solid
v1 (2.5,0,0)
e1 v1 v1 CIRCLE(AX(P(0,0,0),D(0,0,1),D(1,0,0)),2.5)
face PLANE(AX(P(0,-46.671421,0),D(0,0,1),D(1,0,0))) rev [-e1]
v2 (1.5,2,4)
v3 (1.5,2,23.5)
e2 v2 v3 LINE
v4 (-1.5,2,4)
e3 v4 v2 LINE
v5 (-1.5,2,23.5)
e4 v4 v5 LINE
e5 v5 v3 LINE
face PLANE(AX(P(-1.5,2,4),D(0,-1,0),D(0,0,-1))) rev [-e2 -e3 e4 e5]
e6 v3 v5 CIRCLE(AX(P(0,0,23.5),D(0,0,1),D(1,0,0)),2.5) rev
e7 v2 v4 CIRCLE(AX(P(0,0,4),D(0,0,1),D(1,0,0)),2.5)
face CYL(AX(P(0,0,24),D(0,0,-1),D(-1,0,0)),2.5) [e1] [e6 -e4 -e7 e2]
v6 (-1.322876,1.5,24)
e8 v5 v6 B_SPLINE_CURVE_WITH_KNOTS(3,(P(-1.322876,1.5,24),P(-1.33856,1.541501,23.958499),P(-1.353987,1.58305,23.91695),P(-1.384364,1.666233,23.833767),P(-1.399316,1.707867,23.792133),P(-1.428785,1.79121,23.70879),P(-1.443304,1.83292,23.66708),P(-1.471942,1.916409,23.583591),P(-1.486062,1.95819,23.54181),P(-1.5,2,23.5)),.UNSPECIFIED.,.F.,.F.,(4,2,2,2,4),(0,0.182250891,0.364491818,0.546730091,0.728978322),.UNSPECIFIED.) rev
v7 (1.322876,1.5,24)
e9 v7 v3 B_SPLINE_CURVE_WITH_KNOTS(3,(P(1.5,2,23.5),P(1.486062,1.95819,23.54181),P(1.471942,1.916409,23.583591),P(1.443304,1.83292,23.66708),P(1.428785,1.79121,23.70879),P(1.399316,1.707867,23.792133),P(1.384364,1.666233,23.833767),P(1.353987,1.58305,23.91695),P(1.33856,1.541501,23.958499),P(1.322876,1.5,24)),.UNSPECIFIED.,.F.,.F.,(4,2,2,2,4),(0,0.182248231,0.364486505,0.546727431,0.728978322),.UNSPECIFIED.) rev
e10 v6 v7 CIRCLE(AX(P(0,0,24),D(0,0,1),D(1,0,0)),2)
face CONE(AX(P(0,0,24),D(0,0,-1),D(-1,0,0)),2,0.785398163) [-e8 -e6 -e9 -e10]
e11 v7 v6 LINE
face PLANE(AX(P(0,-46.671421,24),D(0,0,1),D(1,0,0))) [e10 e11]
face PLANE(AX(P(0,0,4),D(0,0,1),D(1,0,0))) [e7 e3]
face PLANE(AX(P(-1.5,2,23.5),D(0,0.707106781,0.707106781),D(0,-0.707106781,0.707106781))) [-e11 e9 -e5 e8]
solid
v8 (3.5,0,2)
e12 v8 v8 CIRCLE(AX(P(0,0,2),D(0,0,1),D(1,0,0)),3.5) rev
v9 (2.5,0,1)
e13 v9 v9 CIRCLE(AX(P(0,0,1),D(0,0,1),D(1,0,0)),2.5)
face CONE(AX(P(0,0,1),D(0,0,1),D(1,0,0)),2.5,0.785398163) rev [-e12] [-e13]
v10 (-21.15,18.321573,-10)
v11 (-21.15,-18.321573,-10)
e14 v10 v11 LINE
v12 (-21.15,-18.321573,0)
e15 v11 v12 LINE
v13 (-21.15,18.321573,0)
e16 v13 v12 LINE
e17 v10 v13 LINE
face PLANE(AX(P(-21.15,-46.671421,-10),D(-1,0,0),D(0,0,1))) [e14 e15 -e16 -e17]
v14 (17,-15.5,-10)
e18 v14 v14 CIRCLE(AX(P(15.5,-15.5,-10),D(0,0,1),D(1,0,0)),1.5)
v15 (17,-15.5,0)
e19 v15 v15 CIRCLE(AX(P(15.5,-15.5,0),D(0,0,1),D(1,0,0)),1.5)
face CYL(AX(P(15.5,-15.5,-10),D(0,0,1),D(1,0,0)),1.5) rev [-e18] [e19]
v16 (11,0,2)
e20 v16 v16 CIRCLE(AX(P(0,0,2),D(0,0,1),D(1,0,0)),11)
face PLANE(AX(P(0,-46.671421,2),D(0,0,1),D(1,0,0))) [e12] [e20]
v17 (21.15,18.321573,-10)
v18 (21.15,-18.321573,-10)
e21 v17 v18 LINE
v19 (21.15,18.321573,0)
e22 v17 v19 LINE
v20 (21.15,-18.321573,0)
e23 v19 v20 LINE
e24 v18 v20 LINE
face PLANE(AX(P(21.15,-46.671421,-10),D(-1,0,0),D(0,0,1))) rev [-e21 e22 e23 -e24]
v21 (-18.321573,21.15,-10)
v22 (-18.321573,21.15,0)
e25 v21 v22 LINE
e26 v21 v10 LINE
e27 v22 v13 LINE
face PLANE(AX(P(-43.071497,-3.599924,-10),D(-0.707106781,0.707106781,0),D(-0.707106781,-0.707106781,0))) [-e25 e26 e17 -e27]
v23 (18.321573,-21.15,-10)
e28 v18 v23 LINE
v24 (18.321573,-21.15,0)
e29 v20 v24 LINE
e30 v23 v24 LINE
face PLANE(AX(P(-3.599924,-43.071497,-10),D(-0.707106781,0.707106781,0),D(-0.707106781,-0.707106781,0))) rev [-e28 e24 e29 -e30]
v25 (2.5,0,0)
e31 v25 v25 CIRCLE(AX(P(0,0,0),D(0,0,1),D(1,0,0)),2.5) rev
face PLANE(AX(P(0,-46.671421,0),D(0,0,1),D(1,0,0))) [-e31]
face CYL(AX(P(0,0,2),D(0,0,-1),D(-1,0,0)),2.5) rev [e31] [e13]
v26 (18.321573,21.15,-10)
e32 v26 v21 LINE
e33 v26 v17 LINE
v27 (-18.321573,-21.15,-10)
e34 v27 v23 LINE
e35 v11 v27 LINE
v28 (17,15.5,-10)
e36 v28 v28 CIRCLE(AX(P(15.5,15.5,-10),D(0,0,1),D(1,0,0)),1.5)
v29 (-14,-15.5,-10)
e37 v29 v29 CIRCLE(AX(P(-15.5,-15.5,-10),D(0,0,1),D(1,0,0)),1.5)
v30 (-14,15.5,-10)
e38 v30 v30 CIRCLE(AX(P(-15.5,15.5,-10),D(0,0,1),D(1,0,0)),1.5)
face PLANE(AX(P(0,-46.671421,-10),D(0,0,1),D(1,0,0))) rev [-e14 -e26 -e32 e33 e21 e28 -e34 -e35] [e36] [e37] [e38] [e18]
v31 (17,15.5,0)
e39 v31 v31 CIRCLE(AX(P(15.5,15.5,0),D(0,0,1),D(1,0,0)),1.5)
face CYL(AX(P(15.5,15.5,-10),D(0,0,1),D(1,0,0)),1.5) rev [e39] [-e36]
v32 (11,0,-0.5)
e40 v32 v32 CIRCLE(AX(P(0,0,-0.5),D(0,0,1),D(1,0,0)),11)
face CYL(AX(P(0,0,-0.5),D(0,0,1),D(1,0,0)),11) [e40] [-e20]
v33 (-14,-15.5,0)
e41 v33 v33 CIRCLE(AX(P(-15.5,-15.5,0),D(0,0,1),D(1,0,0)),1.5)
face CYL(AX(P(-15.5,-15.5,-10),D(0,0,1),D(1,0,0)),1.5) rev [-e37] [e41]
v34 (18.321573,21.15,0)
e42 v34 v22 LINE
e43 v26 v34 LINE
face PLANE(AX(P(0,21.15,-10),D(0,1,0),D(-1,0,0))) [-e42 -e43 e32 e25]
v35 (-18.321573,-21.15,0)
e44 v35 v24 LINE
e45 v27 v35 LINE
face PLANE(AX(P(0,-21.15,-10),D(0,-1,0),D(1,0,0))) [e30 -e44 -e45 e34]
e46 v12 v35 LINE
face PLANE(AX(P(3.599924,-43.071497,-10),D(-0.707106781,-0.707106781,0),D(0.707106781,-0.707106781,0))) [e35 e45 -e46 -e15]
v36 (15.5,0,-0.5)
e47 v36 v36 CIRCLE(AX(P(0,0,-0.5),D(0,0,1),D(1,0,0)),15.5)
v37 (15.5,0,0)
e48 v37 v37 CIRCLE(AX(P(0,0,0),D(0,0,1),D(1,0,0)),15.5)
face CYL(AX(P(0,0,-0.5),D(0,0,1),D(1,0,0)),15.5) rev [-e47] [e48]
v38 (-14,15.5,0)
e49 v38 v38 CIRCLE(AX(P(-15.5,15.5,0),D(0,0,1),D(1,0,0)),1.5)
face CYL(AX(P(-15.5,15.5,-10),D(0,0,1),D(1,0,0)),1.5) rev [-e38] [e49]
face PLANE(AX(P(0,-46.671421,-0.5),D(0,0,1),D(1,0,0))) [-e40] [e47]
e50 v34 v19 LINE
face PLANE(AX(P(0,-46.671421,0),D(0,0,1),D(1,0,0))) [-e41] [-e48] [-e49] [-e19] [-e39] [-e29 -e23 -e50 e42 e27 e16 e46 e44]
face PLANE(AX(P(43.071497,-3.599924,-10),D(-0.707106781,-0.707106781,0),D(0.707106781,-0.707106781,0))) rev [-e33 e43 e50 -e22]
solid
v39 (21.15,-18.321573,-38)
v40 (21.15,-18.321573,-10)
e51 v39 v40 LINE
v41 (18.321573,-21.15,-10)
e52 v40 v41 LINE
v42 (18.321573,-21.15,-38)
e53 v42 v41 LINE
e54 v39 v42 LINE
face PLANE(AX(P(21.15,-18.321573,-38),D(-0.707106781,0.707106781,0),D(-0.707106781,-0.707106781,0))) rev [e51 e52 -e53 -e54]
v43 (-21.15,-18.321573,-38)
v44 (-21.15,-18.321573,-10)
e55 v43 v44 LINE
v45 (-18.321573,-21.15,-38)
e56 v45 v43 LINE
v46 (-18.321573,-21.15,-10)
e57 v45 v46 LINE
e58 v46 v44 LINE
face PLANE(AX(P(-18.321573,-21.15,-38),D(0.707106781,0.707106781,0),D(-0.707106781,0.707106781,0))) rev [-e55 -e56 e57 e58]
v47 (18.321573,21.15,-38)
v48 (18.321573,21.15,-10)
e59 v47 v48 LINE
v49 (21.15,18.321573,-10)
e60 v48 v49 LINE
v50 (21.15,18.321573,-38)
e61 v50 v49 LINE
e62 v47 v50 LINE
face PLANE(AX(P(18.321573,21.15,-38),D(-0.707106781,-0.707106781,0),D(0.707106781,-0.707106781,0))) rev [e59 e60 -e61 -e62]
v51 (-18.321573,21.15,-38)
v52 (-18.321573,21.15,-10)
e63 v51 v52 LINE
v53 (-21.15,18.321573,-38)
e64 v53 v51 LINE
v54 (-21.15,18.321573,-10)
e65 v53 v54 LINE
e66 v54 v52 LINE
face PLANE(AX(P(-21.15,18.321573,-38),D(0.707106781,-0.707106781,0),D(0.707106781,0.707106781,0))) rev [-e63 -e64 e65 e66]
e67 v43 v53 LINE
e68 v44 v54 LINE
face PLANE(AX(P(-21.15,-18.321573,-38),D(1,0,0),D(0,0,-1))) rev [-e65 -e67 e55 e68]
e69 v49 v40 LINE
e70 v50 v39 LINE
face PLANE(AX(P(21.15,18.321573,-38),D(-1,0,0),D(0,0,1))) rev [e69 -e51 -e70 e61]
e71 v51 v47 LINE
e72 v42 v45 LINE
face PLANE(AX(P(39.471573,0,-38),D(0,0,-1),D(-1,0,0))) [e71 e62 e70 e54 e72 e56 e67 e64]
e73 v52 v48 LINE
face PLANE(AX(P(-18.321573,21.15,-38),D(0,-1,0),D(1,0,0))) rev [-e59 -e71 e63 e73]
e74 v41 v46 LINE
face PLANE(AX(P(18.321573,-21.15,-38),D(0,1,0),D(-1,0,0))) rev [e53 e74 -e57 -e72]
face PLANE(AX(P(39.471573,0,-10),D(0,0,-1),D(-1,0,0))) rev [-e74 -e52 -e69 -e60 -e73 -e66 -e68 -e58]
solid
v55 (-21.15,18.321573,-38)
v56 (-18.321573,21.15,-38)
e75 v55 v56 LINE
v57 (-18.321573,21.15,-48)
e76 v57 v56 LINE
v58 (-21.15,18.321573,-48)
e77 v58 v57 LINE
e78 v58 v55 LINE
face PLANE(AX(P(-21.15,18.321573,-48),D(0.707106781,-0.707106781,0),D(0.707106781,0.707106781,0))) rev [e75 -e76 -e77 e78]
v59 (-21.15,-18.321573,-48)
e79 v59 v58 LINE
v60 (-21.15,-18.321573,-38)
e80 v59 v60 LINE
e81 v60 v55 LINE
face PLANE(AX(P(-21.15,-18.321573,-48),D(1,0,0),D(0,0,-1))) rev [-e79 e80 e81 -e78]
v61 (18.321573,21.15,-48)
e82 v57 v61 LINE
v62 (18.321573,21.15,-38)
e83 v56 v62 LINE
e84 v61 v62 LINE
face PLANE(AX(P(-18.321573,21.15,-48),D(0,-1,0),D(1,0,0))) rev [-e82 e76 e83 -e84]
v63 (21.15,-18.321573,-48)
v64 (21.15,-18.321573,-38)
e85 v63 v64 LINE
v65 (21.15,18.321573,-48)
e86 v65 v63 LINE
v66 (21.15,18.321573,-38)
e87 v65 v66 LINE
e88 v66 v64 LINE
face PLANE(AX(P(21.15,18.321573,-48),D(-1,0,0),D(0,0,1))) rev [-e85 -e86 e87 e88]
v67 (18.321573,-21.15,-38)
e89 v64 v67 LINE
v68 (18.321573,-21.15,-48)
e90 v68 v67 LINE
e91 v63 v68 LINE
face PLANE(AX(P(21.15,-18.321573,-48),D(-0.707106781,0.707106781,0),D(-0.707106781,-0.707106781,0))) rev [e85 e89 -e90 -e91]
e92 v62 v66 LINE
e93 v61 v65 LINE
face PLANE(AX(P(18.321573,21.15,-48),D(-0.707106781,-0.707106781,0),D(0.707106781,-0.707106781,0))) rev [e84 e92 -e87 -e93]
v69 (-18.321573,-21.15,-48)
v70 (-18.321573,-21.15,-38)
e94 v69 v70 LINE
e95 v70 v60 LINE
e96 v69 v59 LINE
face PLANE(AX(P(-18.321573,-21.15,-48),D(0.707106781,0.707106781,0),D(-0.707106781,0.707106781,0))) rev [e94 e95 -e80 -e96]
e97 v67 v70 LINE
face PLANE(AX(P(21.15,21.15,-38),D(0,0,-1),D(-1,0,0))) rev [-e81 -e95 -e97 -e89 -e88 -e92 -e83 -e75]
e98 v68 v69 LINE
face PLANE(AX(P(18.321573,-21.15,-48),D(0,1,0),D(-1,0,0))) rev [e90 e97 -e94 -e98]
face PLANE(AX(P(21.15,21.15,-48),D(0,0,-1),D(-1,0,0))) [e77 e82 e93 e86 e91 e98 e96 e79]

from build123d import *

# Parameters (mm, degrees)
SKETCH_1_R          = 1.5
EXTRUDE_1_DEPTH     = 10
EXTRUDE_2_DEPTH     = 28
EXTRUDE_3_DEPTH     = 10
SKETCH_1_3_R        = 15.5
SKETCH_1_3_R_2      = 11
CUT_EXTRUDE_1_DEPTH = 0.5
EXTRUDE_START       = 2
SKETCH_1_4_R        = 11
SKETCH_1_4_R_2      = 2.5
EXTRUDE_4_DEPTH     = 2
CHAMFER_1_SIZE      = 1
SKETCH_1_5_R        = 2.5
EXTRUDE_5_DEPTH     = 24
CUT_EXTRUDE_2_DEPTH = 20
CHAMFER_2_SIZE      = 0.5


with BuildPart() as part:
    # 草图1 → 凸台-拉伸1 (new body)
    with BuildSketch(Plane.XY):
        Polygon((18.321572875, 21.15), (-18.321572875, 21.15), (-21.15, 18.321572875), (-21.15, -18.321572875), (-18.321572875, -21.15), (18.321572875, -21.15), (21.15, -18.321572875), (21.15, 18.321572875), align=None)
        with Locations((-15.5, 15.5)):
            Circle(SKETCH_1_R, mode=Mode.SUBTRACT)
        with Locations((15.5, 15.5)):
            Circle(SKETCH_1_R, mode=Mode.SUBTRACT)
        with Locations((15.5, -15.5)):
            Circle(SKETCH_1_R, mode=Mode.SUBTRACT)
        with Locations((-15.5, -15.5)):
            Circle(SKETCH_1_R, mode=Mode.SUBTRACT)
    extrude(amount=-EXTRUDE_1_DEPTH)

    # 草图1<3> → 切除-拉伸1 (cut)
    with BuildSketch(Plane.XY):
        Circle(SKETCH_1_3_R)
        Circle(SKETCH_1_3_R_2, mode=Mode.SUBTRACT)
    extrude(amount=-CUT_EXTRUDE_1_DEPTH, mode=Mode.SUBTRACT)

    # 草图1<4> → 凸台-拉伸4 (add)
    with BuildSketch(Plane.XY.offset(EXTRUDE_START)):
        Circle(SKETCH_1_4_R)
        Circle(SKETCH_1_4_R_2, mode=Mode.SUBTRACT)
    extrude(amount=-EXTRUDE_4_DEPTH)

    # 倒角1
    chamfer_1_edges = [part.edges().sort_by_distance(p)[0] for p in [
        (-2.5, 0, 2),
    ]]
    chamfer(chamfer_1_edges, length=CHAMFER_1_SIZE)


with BuildPart() as body_2:
    # 草图2 → 凸台-拉伸2 (new body)
    with BuildSketch(Plane(origin=(0, 0, -10), x_dir=(-1, 0, 0), z_dir=(0, 0, -1))):
        Polygon((-21.15, 18.321572875), (-21.15, -18.321572875), (-18.321572875, -21.15), (18.321572875, -21.15), (21.15, -18.321572875), (21.15, 18.321572875), (18.321572875, 21.15), (-18.321572875, 21.15), align=None)
    extrude(amount=EXTRUDE_2_DEPTH)


with BuildPart() as body_3:
    # 草图3 → 凸台-拉伸3 (new body)
    with BuildSketch(Plane(origin=(0, 0, -38), x_dir=(-1, 0, 0), z_dir=(0, 0, -1))):
        Polygon((-18.321572875, 21.15), (-21.15, 18.321572875), (-21.15, -18.321572875), (-18.321572875, -21.15), (18.321572875, -21.15), (21.15, -18.321572875), (21.15, 18.321572875), (18.321572875, 21.15), align=None)
    extrude(amount=EXTRUDE_3_DEPTH)


with BuildPart() as body_4:
    # 草图1<5> → 凸台-拉伸5 (new body)
    with BuildSketch(Plane.XY):
        Circle(SKETCH_1_5_R)
    extrude(amount=EXTRUDE_5_DEPTH)

    # 草图4 → 切除-拉伸2 (cut)
    with BuildSketch(Plane.XY.offset(24)):
        with BuildLine():
            Line((-1.5, 2), (1.5, 2))
            ThreePointArc((1.5, 2), (0, 2.5), (-1.5, 2))
        make_face()
    extrude(amount=-CUT_EXTRUDE_2_DEPTH, mode=Mode.SUBTRACT)

    # 倒角2
    chamfer_2_edges = [body_4.edges().sort_by_distance(p)[0] for p in [
        (-1.118033989, -2.236067977, 24),
        (0, 2, 24),
    ]]
    chamfer(chamfer_2_edges, length=CHAMFER_2_SIZE - 0.0001)  # a hair under: the kernel refuses the full size


solid = Compound([part.part, body_2.part, body_3.part, body_4.part])
